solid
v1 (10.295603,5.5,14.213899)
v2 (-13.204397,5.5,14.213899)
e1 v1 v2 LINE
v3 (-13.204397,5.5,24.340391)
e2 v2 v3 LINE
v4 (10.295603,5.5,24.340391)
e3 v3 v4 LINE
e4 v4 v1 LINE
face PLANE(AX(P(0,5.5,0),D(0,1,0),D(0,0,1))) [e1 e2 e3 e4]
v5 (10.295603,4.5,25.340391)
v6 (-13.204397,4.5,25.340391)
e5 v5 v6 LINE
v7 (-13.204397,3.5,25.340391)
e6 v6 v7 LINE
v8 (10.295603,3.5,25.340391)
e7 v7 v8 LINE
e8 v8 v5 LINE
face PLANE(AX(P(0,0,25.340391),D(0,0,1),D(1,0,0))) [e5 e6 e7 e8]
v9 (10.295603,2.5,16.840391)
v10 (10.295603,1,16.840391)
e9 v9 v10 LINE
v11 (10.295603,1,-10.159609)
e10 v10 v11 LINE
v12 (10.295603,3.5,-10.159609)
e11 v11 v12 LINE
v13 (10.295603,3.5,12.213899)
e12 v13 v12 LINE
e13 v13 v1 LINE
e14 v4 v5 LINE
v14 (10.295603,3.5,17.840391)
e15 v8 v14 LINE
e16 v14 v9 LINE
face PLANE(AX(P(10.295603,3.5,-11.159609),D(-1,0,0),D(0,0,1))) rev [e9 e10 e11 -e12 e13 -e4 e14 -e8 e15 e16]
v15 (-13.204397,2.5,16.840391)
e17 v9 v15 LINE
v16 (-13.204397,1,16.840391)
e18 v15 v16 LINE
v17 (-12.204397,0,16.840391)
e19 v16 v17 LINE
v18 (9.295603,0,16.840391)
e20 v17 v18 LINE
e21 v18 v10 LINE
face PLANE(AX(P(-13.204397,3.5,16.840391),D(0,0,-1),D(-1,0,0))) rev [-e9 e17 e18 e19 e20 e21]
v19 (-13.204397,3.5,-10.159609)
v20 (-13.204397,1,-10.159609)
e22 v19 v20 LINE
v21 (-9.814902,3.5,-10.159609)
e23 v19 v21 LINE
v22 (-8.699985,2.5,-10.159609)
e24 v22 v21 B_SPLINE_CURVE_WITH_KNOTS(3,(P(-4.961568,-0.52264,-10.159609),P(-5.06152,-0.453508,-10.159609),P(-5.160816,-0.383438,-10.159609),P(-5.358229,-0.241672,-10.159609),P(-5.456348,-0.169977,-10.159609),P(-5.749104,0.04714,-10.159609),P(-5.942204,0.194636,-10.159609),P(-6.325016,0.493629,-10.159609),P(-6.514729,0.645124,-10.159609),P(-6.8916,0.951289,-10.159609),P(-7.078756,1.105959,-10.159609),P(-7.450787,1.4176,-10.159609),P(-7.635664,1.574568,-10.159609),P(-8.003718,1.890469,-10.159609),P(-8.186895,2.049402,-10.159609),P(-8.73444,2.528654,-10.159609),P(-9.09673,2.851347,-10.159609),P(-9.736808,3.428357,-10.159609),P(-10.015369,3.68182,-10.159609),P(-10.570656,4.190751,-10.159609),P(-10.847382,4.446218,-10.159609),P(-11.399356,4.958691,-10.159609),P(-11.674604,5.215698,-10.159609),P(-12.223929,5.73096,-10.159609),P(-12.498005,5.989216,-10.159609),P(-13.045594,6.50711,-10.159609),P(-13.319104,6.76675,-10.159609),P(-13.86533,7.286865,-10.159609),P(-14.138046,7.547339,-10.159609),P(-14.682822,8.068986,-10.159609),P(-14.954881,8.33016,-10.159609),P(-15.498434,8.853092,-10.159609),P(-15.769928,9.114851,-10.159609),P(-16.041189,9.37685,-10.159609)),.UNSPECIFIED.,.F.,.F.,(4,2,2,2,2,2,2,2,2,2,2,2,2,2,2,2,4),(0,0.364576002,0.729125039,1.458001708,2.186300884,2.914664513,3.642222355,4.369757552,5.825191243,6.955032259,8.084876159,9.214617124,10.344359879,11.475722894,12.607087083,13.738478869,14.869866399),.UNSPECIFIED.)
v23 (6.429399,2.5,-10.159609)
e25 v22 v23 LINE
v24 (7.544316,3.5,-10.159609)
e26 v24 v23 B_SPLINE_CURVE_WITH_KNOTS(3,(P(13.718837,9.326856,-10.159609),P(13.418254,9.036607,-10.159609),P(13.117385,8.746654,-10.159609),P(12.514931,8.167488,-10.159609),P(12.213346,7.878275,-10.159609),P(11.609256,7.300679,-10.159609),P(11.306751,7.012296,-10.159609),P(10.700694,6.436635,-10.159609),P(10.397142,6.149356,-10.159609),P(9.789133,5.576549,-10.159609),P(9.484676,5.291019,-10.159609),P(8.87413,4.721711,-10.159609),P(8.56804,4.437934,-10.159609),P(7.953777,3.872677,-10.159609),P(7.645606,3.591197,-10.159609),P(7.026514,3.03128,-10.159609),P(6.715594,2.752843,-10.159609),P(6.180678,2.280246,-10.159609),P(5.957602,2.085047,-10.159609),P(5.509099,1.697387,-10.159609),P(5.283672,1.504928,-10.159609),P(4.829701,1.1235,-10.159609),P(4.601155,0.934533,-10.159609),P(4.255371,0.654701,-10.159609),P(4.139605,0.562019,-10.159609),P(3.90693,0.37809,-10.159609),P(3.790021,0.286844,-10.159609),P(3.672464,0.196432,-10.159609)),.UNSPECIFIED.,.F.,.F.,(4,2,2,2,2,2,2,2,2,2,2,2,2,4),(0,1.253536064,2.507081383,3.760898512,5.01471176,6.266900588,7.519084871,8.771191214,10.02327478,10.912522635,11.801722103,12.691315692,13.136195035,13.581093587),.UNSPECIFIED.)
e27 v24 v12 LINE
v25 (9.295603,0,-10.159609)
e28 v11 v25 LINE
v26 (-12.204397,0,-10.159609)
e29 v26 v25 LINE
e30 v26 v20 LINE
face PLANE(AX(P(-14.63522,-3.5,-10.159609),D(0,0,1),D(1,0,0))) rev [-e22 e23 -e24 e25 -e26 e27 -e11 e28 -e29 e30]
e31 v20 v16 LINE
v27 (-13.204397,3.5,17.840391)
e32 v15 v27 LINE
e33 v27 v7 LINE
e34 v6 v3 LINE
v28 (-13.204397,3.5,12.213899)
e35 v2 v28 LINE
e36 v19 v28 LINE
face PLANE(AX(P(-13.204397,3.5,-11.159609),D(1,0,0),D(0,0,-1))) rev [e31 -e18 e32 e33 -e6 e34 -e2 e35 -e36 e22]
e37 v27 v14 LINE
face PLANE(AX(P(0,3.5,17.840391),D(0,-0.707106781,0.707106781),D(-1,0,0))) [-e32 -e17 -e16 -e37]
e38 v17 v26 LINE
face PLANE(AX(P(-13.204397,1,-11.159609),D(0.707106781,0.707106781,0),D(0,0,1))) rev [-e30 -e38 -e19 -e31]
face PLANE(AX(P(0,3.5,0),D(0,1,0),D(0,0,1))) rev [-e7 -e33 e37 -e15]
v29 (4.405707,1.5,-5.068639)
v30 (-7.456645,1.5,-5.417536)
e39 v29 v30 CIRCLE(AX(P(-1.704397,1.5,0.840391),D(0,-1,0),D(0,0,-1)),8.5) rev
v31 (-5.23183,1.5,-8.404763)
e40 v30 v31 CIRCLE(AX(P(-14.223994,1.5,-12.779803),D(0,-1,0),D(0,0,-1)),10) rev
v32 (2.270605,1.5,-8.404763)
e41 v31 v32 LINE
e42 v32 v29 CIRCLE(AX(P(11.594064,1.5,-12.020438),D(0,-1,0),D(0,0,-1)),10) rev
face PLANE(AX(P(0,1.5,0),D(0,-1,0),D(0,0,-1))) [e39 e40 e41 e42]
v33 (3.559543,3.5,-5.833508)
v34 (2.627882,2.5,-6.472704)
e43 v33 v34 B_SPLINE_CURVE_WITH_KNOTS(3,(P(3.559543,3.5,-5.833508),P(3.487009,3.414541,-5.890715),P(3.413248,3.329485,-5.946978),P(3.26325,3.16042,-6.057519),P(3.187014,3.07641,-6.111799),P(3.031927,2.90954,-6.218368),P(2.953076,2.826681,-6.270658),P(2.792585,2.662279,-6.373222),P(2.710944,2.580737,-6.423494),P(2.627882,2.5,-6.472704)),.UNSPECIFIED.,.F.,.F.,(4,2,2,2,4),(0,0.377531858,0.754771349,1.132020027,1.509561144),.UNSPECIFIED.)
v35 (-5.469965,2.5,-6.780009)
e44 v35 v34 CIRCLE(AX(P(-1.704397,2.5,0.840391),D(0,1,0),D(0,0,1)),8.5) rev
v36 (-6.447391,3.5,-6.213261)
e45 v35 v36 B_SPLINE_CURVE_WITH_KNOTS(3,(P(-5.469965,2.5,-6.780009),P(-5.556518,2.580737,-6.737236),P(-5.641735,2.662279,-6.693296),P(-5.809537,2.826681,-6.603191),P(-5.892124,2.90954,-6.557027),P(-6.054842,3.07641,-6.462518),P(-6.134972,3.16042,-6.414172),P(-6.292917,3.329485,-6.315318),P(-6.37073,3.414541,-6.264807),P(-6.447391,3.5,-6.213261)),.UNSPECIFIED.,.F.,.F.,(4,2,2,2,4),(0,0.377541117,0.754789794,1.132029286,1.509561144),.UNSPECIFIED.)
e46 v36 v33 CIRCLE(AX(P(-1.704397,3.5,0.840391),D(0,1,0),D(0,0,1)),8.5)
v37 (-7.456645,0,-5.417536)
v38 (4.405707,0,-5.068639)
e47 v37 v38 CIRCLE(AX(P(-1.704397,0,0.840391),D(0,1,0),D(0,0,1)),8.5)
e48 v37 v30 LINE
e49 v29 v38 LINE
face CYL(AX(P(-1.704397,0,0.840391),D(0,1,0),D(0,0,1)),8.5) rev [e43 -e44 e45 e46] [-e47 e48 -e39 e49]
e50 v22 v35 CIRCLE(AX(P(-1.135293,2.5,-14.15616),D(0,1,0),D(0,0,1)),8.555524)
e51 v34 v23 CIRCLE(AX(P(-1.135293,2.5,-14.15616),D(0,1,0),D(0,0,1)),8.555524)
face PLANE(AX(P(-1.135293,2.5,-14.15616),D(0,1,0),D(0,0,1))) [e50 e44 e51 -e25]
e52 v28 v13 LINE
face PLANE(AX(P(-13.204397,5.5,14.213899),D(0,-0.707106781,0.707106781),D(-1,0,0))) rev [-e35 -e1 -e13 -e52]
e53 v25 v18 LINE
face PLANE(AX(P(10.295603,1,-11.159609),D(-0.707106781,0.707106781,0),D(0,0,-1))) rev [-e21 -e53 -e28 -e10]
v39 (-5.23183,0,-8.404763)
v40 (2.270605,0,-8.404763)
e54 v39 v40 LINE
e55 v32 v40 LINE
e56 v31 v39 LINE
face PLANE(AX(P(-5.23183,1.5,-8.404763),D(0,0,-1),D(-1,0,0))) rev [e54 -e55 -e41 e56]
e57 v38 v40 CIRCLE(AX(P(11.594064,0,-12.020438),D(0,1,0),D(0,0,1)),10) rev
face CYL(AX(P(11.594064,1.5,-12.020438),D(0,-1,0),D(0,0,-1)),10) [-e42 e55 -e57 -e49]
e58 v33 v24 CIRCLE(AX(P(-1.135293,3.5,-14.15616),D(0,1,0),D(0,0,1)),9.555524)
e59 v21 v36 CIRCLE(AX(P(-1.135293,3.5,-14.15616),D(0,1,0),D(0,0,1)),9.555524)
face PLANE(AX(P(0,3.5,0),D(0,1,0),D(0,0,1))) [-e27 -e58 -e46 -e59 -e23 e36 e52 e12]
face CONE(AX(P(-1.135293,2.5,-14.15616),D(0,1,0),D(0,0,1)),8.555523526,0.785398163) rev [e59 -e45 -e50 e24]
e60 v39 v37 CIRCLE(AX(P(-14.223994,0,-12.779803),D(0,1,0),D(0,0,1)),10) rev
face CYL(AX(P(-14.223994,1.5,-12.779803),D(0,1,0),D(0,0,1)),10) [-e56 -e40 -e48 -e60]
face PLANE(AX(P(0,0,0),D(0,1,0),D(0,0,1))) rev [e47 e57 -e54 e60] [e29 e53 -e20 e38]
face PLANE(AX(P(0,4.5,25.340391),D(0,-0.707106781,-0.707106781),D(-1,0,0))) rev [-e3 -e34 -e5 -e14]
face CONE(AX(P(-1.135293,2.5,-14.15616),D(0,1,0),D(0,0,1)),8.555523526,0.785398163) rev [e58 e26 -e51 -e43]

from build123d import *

# Parameters (mm, degrees)
SKETCH1_W           = 23.5
SKETCH1_H           = 28
BOSS_EXTRUDE1_DEPTH = 3.5
CHAMFER1_SIZE       = 1
SKETCH2_R           = 8.5
CUT_EXTRUDE1_DEPTH  = 3.5
SKETCH3_R           = 9.555523526
CUT_EXTRUDE3_DEPTH  = 1
CHAMFER2_SIZE       = 1
SKETCH4_W           = 23.5
SKETCH4_H           = 9.126491789
BOSS_EXTRUDE2_DEPTH = 2
CHAMFER3_SIZE       = 2
CHAMFER4_SIZE       = 1
SKETCH5_W           = 7.502434646
SKETCH5_H           = 2.891999948
CUT_EXTRUDE4_DEPTH  = 1.5
FILLET1_R           = 10
SKETCH6_W           = 23.5
SKETCH6_H           = 2
BOSS_EXTRUDE3_DEPTH = 2
SKETCH7_W           = 25.736202914
SKETCH7_H           = 1.90415655
CUT_EXTRUDE6_DEPTH  = 7
CHAMFER5_SIZE       = 1


# Some blends are built 0.0001 mm under size
with BuildPart() as part:
    # Sketch1 → Boss-Extrude1 (new body)
    with BuildSketch(Plane(origin=(0, 0, 0), x_dir=(1, 0, 0), z_dir=(0, 1, 0))):
        with Locations((-1.454397394, -2.840390879)):
            Rectangle(SKETCH1_W, SKETCH1_H)
    extrude(amount=BOSS_EXTRUDE1_DEPTH)

    # Chamfer1
    chamfer1_edges = [part.edges().sort_by_distance(p)[0] for p in [
        (-1.454397394, 0, -11.159609121),
        (10.295602606, 0, 2.840390879),
        (-13.204397394, 0, 2.840390879),
    ]]
    chamfer(chamfer1_edges, length=CHAMFER1_SIZE)

    # Sketch2 → Cut-Extrude1 (cut)
    with BuildSketch(Plane(origin=(0, 3.5, 0), x_dir=(1, 0, 0), z_dir=(0, 1, 0))):
        with Locations(Location((-1.704397394, -0.840390879, 0), (0, 0, 270))):
            Circle(SKETCH2_R)
    extrude(amount=-CUT_EXTRUDE1_DEPTH, mode=Mode.SUBTRACT)

    # Sketch3 → Cut-Extrude3 (cut)
    with BuildSketch(Plane(origin=(0, 3.5, 0), x_dir=(1, 0, 0), z_dir=(0, 1, 0))):
        with Locations((-1.135292968, 14.156160389)):
            Circle(SKETCH3_R)
    extrude(amount=-CUT_EXTRUDE3_DEPTH, mode=Mode.SUBTRACT)

    # Chamfer2
    chamfer2_edges = [part.edges().sort_by_distance(p)[0] for p in [
        (-8.74141347, 2.5, -8.372134044),
        (6.246016299, 2.5, -8.087857218),
    ]]
    chamfer(chamfer2_edges, length=CHAMFER2_SIZE - 0.0001)  # a hair under: the kernel refuses the full size

    # Sketch4 → Boss-Extrude2 (add)
    with BuildSketch(Plane(origin=(0, 3.5, 0), x_dir=(1, 0, 0), z_dir=(0, 1, 0))):
        with Locations((-1.454397394, -18.777144985)):
            Rectangle(SKETCH4_W, SKETCH4_H)
    extrude(amount=BOSS_EXTRUDE2_DEPTH)

    # Chamfer3
    chamfer3_edges = [part.edges().sort_by_distance(p)[0] for p in [
        (-1.454397394, 3.5, 14.21389909),
    ]]
    chamfer(chamfer3_edges, length=CHAMFER3_SIZE - 0.0001)  # a hair under: the kernel refuses the full size

    # Chamfer4
    chamfer4_edges = [part.edges().sort_by_distance(p)[0] for p in [
        (-1.454397394, 3.5, 16.840390879),
    ]]
    chamfer(chamfer4_edges, length=CHAMFER4_SIZE)

    # Sketch5 → Cut-Extrude4 (cut)
    with BuildSketch(Plane.XZ):
        with Locations((-1.480612468, -6.958763205)):
            Rectangle(SKETCH5_W, SKETCH5_H)
    extrude(amount=-CUT_EXTRUDE4_DEPTH, mode=Mode.SUBTRACT)

    # Fillet1
    # the kernel refuses this fillet: 10 mm, written as the material it takes off along each edge
    with BuildSketch(Plane(origin=(2.270604855, -6.676580089, -6.67288784), x_dir=(0.799474341505259, 0, 0.6007002391165933), z_dir=(0, 1, 0))) as fillet1_piece_1:
        with BuildLine():
            CenterArc((4.241592057, 9.875833363), FILLET1_R, 238.116555861, 22.84506635)
            Line((-1.04033793, 1.384589896), (0, 0))
            ThreePointArc((0, 0), (1.335316018, 0.105541642), (2.670632036, 0))
        make_face()
    extrude(amount=8.176580089, mode=Mode.SUBTRACT)
    with BuildSketch(Plane(origin=(-5.231829791, -6.674182658, -6.89312195), x_dir=(-0.8333660281094135, 0, 0.552721505998401), z_dir=(0, 1, 0))) as fillet1_piece_2:
        with BuildLine():
            CenterArc((4.240068983, -9.875923079), FILLET1_R, 99.035105105, 21.466237943)
            Line((-0.835516616, -1.259750447), (0, 0))
            ThreePointArc((0, 0), (1.334836532, -0.105465383), (2.669673063, 0))
        make_face()
    extrude(amount=8.174182658, mode=Mode.SUBTRACT)

    # Sketch6 → Boss-Extrude3 (add)
    with BuildSketch(Plane.XY.offset(23.340390879)):
        with Locations((-1.454397394, 4.5)):
            Rectangle(SKETCH6_W, SKETCH6_H)
    extrude(amount=BOSS_EXTRUDE3_DEPTH)

    # Sketch7 → Cut-Extrude6 (cut)
    with BuildSketch(Plane(origin=(0, 3.5, 0), x_dir=(1, 0, 0), z_dir=(0, 1, 0))):
        with Locations((-1.767118607, 11.111687396)):
            Rectangle(SKETCH7_W, SKETCH7_H)
    extrude(amount=-CUT_EXTRUDE6_DEPTH, mode=Mode.SUBTRACT)

    # Chamfer5
    chamfer5_edges = [part.edges().sort_by_distance(p)[0] for p in [
        (-1.454397394, 5.5, 25.340390879),
    ]]
    chamfer(chamfer5_edges, length=CHAMFER5_SIZE)


solid = part.part
